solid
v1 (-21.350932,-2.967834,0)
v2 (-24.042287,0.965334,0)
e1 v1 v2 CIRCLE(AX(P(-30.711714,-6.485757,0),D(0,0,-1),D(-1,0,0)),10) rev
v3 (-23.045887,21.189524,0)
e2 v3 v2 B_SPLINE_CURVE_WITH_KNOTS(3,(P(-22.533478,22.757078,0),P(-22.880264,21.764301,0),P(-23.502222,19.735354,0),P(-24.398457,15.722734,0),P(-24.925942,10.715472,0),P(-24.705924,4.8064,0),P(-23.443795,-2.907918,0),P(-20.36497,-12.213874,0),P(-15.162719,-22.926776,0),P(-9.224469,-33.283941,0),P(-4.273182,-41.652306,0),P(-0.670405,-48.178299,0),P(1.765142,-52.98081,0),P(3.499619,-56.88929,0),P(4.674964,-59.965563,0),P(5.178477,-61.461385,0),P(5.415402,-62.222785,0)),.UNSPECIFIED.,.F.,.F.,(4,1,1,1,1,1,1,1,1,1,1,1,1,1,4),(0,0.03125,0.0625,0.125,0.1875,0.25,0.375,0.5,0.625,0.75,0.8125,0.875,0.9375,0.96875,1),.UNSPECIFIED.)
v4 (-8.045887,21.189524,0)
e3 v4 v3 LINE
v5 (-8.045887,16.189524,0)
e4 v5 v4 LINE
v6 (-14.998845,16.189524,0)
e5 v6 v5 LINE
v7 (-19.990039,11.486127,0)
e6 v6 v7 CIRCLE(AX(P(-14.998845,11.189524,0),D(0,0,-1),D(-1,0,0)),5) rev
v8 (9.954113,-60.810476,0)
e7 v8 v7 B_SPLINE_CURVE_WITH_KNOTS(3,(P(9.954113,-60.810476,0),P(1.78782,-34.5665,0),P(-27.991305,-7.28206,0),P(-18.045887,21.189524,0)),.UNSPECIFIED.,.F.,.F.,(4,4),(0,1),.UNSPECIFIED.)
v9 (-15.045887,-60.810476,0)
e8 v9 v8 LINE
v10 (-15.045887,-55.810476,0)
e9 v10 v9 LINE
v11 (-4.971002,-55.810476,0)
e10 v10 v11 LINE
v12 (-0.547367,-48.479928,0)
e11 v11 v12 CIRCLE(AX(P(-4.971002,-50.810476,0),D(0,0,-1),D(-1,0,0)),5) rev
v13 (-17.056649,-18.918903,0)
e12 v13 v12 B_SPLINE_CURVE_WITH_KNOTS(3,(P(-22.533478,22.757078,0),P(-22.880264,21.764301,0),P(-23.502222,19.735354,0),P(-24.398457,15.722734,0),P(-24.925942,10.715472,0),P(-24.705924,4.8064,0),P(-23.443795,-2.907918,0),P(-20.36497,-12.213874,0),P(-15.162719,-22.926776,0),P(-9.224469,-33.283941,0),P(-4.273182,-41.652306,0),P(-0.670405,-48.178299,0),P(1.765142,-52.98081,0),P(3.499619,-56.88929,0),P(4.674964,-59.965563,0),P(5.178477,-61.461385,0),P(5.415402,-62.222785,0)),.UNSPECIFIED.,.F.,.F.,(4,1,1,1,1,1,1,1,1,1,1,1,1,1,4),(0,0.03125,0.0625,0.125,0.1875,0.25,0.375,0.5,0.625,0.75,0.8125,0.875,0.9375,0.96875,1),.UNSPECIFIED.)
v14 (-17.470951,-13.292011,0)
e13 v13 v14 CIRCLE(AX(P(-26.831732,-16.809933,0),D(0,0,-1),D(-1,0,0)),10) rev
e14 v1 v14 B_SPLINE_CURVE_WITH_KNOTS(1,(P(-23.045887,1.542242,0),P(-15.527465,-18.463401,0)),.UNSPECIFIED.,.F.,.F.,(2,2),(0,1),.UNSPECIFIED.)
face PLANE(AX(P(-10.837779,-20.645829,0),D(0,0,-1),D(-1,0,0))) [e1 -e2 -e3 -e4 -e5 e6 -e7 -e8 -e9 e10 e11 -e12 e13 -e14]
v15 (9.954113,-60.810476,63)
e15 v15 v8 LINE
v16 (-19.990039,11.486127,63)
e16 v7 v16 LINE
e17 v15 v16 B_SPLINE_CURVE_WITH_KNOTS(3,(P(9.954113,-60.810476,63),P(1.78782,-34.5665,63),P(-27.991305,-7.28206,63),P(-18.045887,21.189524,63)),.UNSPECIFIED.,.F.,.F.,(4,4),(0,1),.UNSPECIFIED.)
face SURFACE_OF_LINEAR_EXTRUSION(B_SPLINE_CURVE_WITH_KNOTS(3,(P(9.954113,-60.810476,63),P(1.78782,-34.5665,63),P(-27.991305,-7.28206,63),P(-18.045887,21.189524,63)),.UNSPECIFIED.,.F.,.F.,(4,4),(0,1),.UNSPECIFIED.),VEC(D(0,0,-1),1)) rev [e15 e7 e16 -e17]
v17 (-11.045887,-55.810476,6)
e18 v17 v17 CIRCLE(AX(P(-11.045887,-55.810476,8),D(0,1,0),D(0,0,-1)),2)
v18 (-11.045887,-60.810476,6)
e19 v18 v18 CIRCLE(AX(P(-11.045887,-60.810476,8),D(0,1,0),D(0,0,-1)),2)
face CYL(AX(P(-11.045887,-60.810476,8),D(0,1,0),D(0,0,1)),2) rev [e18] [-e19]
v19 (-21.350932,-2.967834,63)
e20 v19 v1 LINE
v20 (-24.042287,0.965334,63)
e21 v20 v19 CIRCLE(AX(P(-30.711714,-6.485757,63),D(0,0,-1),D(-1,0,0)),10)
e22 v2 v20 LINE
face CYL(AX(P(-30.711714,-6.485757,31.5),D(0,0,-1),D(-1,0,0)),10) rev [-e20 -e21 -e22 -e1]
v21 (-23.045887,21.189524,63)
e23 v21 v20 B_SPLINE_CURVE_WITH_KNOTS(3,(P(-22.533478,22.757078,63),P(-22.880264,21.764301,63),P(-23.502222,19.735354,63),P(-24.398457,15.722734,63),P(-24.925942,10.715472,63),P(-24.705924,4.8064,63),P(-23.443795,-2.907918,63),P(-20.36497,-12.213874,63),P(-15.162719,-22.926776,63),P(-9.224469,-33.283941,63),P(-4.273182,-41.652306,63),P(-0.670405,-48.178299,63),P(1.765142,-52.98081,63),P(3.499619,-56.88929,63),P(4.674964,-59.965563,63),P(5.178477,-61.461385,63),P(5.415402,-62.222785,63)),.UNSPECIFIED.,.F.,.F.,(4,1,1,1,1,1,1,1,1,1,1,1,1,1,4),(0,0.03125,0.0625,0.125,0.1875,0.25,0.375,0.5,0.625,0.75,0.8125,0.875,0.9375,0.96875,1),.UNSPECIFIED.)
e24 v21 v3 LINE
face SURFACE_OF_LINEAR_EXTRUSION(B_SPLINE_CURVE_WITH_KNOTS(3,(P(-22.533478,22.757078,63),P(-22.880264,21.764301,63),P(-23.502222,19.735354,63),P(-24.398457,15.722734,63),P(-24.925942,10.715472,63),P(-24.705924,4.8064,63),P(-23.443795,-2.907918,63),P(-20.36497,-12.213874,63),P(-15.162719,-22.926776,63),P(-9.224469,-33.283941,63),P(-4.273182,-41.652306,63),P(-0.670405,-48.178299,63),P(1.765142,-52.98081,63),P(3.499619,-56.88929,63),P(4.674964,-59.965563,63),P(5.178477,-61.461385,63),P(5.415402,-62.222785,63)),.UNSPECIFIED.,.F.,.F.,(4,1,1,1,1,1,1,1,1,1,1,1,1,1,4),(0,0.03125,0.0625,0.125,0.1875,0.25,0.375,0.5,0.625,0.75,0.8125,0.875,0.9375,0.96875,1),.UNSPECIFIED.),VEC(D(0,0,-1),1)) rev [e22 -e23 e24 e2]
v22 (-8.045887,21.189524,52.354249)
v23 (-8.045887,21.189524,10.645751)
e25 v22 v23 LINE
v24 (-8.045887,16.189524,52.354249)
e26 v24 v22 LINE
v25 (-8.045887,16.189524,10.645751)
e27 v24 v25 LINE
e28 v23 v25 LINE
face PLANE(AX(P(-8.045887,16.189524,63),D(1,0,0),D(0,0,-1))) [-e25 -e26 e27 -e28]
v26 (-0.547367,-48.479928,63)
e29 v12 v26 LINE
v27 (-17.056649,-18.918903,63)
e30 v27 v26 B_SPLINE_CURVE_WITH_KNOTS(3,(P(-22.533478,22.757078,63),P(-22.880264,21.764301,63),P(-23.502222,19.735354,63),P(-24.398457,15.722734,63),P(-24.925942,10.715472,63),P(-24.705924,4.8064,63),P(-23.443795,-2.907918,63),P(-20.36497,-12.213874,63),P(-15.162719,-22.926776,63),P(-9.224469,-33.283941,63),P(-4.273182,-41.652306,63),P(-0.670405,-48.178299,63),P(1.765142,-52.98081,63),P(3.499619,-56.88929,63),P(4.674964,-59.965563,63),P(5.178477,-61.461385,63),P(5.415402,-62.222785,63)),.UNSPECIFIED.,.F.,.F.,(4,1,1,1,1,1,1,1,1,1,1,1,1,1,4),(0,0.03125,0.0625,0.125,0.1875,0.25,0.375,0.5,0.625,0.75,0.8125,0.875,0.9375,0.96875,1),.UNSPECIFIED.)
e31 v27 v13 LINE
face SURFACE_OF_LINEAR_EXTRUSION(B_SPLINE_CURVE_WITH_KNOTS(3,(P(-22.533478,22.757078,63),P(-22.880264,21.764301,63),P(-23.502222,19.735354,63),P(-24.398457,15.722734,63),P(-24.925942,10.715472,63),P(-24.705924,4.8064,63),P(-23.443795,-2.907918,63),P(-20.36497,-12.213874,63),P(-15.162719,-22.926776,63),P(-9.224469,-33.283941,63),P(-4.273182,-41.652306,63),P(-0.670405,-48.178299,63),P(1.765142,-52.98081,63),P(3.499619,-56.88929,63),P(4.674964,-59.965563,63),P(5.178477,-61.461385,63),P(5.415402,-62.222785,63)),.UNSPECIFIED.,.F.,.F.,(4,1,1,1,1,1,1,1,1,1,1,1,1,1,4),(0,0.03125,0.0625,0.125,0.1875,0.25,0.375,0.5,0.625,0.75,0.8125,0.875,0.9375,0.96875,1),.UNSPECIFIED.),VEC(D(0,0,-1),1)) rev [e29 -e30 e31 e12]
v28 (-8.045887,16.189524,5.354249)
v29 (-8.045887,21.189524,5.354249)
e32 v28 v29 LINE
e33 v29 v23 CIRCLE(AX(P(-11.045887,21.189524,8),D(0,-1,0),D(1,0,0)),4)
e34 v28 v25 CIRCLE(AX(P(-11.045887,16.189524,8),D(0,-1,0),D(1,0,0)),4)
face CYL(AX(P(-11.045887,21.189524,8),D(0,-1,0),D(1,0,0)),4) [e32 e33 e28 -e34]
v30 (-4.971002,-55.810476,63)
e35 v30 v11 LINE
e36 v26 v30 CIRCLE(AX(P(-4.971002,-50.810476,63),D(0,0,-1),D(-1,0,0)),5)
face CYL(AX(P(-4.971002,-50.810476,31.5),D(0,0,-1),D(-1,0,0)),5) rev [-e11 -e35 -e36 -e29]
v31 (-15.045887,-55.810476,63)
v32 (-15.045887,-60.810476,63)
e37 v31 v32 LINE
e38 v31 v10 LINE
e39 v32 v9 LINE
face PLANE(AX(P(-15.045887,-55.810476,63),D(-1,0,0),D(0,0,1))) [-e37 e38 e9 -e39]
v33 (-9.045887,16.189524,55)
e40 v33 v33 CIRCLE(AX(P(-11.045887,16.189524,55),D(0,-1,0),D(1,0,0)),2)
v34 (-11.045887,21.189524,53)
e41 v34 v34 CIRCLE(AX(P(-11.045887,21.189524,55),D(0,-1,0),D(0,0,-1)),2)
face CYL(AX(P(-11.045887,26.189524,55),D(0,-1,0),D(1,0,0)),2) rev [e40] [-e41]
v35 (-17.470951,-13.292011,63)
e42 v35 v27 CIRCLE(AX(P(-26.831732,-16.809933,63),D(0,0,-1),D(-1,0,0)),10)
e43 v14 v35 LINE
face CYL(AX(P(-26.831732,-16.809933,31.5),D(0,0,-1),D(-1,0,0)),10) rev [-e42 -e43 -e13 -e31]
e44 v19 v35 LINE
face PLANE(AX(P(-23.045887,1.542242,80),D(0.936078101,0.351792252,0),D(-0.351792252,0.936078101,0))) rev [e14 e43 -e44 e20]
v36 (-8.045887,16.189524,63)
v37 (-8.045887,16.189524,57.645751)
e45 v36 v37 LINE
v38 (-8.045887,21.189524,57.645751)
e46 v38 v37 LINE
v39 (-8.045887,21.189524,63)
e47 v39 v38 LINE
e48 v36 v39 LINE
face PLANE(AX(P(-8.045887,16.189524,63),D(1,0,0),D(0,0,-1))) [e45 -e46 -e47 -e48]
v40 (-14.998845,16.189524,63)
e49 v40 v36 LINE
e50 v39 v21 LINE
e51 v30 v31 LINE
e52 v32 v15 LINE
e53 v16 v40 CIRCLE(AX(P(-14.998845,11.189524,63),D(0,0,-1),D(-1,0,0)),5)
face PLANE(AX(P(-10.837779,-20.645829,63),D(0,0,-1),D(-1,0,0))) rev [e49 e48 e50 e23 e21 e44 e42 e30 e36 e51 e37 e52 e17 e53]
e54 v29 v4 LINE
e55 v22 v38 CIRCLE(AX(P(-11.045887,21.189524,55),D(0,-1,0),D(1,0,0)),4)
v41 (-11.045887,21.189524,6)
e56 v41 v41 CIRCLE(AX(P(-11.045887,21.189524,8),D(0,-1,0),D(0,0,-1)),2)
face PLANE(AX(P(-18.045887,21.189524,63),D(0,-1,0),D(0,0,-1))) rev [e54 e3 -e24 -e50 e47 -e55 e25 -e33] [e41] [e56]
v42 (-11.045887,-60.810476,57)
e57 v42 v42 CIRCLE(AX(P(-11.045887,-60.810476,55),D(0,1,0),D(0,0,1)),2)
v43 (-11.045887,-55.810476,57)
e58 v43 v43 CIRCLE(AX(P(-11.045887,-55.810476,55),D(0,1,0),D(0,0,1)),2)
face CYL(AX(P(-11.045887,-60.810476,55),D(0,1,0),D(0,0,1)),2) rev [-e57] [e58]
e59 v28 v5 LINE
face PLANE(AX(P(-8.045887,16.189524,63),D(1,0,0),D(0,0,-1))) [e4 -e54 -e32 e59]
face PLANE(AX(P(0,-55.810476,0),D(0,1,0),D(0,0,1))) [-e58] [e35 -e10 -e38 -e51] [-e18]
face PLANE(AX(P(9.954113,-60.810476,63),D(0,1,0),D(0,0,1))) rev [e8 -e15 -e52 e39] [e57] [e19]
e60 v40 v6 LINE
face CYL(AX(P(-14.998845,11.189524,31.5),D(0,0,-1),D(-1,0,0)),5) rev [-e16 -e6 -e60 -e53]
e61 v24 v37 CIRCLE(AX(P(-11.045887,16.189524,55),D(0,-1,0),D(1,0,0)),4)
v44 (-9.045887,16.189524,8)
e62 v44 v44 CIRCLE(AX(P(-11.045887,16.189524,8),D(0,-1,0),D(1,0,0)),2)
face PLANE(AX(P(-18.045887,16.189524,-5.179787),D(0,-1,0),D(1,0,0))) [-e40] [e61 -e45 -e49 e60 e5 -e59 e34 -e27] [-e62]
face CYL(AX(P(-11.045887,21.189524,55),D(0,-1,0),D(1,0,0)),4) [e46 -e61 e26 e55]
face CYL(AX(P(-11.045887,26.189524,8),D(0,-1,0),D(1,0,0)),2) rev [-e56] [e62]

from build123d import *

# Parameters (mm, degrees)
BOSS_EXTRUDE1_DEPTH = 63
SKETCH12_W          = 10
SKETCH12_H          = 63
BOSS_EXTRUDE6_DEPTH = 5
BOSS_EXTRUDE7_DEPTH = 63
FILLET4_R           = 5
SKETCH14_R          = 2
CUT_EXTRUDE5_DEPTH  = 10
SKETCH15_R          = 4
SKETCH15_R_2        = 2
BOSS_EXTRUDE8_DEPTH = 5
SKETCH16_W          = 20
SKETCH16_H          = 63
BOSS_EXTRUDE9_DEPTH = 5
FILLET5_R           = 5
CUT_EXTRUDE6_START  = -5
SKETCH17_R          = 2
CUT_EXTRUDE6_DEPTH  = 5
CUT_EXTRUDE7_DEPTH  = 80
FILLET6_R           = 10


# Read off the part's stored shape, not the designer's step: Boss-Extrude1
with BuildPart() as part:
    # Boss-Extrude1 outline → Boss-Extrude1 (new body)
    with BuildSketch(Plane.XY):
        with BuildLine():
            Line((4.954113003, -60.810475982), (9.954113003, -60.810475982))
            add(Edge.make_bspline(
                [(9.954113003, -60.810475982), (1.787820041, -34.566500255), (-27.991304854, -7.282060069), (-18.045886997, 21.189524018)],
                knots=[0, 0, 0, 0, 1, 1, 1, 1], degree=3))
            Line((-18.045886997, 21.189524018), (-23.045886997, 21.189524018))
            add(Edge.make_bspline(
                [(-23.045886997, 21.189524018), (-23.192896954, 20.707388184), (-23.619107908, 19.21203202), (-24.398456673, 15.722733579), (-24.92594246, 10.71547172), (-24.705924446, 4.806399572), (-23.443795498, -2.907918287), (-20.364970108, -12.213873941), (-15.162719206, -22.926775882), (-9.22446855, -33.283941227), (-4.27318175, -41.652306471), (-0.670405229, -48.178299158), (1.765142475, -52.980809676), (3.499618766, -56.88928979), (4.492016037, -59.486726266), (4.856824136, -60.525956387), (4.954113003, -60.810475982)],
                knots=[0.016302379, 0.016302379, 0.016302379, 0.016302379, 0.03125, 0.0625, 0.125, 0.1875, 0.25, 0.375, 0.5, 0.625, 0.75, 0.8125, 0.875, 0.9375, 0.96875, 0.980543141, 0.980543141, 0.980543141, 0.980543141], degree=3))
        make_face()
    extrude(amount=BOSS_EXTRUDE1_DEPTH)



with BuildPart() as body_2:
    # Sketch12 → Boss-Extrude6 (new body)
    with BuildSketch(Plane(origin=(0, 21.189524018, 0), x_dir=(1, 0, 0), z_dir=(0, 1, 0))):
        with Locations((-13.045886997, -31.5)):
            Rectangle(SKETCH12_W, SKETCH12_H)
    extrude(amount=-BOSS_EXTRUDE6_DEPTH)


with BuildPart() as part_1:
    add(part.part)

    add(body_2.part)  # Boss-Extrude7 merges body 2
    # Sketch13 → Boss-Extrude7 (add)
    with BuildSketch(Plane.XY.offset(63)):
        with BuildLine():
            Line((-18.045886997, 16.189524018), (-18.045886997, 21.189524018))
            add(Edge.make_bspline(
                [(-19.398734896, 16.189524018), (-19.076313221, 17.852122544), (-18.629495341, 19.518779331), (-18.045886997, 21.189524018)],
                knots=[0.941318871, 0.941318871, 0.941318871, 0.941318871, 1, 1, 1, 1], degree=3))
            Line((-19.398734896, 16.189524018), (-18.045886997, 16.189524018))
        make_face()
    extrude(amount=-BOSS_EXTRUDE7_DEPTH)

    # Fillet4
    fillet4_edges = [part_1.edges().sort_by_distance(p)[0] for p in [
        (-19.398734896, 16.189524018, 31.5),
    ]]
    fillet(fillet4_edges, radius=FILLET4_R)

    # Sketch14 → Cut-Extrude5 (cut)
    with BuildSketch(Plane.XZ.offset(-16.189524018)):
        with Locations((-11.045886997, 8)):
            Circle(SKETCH14_R)
        with Locations((-11.045886997, 55)):
            Circle(SKETCH14_R)
    extrude(amount=-CUT_EXTRUDE5_DEPTH, mode=Mode.SUBTRACT)

    # Sketch15 → Boss-Extrude8 (add)
    # profile 1 of 2: a face of its own
    with BuildSketch(Plane.XZ.offset(-16.189524018)):
        with Locations((-11.045886997, 55)):
            Circle(SKETCH15_R)
        with Locations((-11.045886997, 55)):
            Circle(SKETCH15_R_2, mode=Mode.SUBTRACT)
    # profile 2 of 2: a face of its own
    with BuildSketch(Plane.XZ.offset(-16.189524018)):
        with Locations((-11.045886997, 8)):
            Circle(SKETCH15_R)
        with Locations((-11.045886997, 8)):
            Circle(SKETCH15_R_2, mode=Mode.SUBTRACT)
    extrude(amount=-BOSS_EXTRUDE8_DEPTH)

    # Sketch16 → Boss-Extrude9 (add)
    with BuildSketch(Plane.XZ.offset(60.810475982)):
        with Locations((-5.045886997, 31.5)):
            Rectangle(SKETCH16_W, SKETCH16_H)
    extrude(amount=-BOSS_EXTRUDE9_DEPTH)

    # Fillet5
    fillet5_edges = [part_1.edges().sort_by_distance(p)[0] for p in [
        (3.003762593, -55.810475982, 31.5),
    ]]
    fillet(fillet5_edges, radius=FILLET5_R)

    # Sketch17 → Cut-Extrude6 (cut)
    with BuildSketch(Plane(origin=(0, -55.810475982, 0), x_dir=(1, 0, 0), z_dir=(0, 1, 0)).offset(CUT_EXTRUDE6_START)):
        with Locations((-11.045886997, -55)):
            Circle(SKETCH17_R)
        with Locations((-11.045886997, -8)):
            Circle(SKETCH17_R)
    extrude(amount=CUT_EXTRUDE6_DEPTH, mode=Mode.SUBTRACT)

    # Sketch18 → Cut-Extrude7 (cut)
    with BuildSketch(Plane(origin=(0, 0, 0), x_dir=(-1, 0, 0), z_dir=(0, 0, -1))):
        Polygon((23.045886997, 1.542241973), (27.88763941, -1.261096589), (21.516415404, -20.247344126), (15.527464839, -18.463401404), align=None)
    extrude(amount=-CUT_EXTRUDE7_DEPTH, mode=Mode.SUBTRACT)

    # Fillet6
    # the kernel refuses this fillet: 10 mm, written as the material it adds along each edge
    with BuildSketch(Plane(origin=(-15.527464839, -18.463401404, 0), x_dir=(-0.958385683586268, -0.28547658660016567, 0), z_dir=(0, 0, 1))) as fillet6_piece_1:
        with BuildLine():
            CenterArc((10.361821719, -4.811763892), FILLET6_R, 151.237737935, 32.771900007)
            Line((0.386298698, -5.51100666), (0.186788237, -5.524991515))
            Line((0.186788237, -5.524991515), (-0.19951046, -0.013984855))
            Line((-0.19951046, -0.013984855), (0, 0.2))
            ThreePointArc((0, 0.2), (0.797791872, 0.2), (1.420258984, 0.096235278))
            Line((1.420258984, 0.096235278), (1.595583743, 0))
        make_face()
    extrude(amount=63)
    with BuildSketch(Plane(origin=(-23.045886997, 1.542241973, 0), x_dir=(0.35179225201059605, -0.9360781011354306, 0), z_dir=(0, 0, 1))) as fillet6_piece_2:
        with BuildLine():
            CenterArc((4.818055228, -10), FILLET6_R, 90, 27.571489076)
            Line((0.189505284, -1.1356599), (0.096934285, -0.958373098))
            ThreePointArc((0.096934285, -0.958373098), (-0.102519699, -0.600748389), (-0.197272341, -0.032918439))
            Line((-0.197272341, -0.032918439), (0, 0.2))
            Line((0, 0.2), (4.818055228, 0.2))
            Line((4.818055228, 0.2), (4.818055228, 0))
        make_face()
    extrude(amount=63)


solid = part_1.part
